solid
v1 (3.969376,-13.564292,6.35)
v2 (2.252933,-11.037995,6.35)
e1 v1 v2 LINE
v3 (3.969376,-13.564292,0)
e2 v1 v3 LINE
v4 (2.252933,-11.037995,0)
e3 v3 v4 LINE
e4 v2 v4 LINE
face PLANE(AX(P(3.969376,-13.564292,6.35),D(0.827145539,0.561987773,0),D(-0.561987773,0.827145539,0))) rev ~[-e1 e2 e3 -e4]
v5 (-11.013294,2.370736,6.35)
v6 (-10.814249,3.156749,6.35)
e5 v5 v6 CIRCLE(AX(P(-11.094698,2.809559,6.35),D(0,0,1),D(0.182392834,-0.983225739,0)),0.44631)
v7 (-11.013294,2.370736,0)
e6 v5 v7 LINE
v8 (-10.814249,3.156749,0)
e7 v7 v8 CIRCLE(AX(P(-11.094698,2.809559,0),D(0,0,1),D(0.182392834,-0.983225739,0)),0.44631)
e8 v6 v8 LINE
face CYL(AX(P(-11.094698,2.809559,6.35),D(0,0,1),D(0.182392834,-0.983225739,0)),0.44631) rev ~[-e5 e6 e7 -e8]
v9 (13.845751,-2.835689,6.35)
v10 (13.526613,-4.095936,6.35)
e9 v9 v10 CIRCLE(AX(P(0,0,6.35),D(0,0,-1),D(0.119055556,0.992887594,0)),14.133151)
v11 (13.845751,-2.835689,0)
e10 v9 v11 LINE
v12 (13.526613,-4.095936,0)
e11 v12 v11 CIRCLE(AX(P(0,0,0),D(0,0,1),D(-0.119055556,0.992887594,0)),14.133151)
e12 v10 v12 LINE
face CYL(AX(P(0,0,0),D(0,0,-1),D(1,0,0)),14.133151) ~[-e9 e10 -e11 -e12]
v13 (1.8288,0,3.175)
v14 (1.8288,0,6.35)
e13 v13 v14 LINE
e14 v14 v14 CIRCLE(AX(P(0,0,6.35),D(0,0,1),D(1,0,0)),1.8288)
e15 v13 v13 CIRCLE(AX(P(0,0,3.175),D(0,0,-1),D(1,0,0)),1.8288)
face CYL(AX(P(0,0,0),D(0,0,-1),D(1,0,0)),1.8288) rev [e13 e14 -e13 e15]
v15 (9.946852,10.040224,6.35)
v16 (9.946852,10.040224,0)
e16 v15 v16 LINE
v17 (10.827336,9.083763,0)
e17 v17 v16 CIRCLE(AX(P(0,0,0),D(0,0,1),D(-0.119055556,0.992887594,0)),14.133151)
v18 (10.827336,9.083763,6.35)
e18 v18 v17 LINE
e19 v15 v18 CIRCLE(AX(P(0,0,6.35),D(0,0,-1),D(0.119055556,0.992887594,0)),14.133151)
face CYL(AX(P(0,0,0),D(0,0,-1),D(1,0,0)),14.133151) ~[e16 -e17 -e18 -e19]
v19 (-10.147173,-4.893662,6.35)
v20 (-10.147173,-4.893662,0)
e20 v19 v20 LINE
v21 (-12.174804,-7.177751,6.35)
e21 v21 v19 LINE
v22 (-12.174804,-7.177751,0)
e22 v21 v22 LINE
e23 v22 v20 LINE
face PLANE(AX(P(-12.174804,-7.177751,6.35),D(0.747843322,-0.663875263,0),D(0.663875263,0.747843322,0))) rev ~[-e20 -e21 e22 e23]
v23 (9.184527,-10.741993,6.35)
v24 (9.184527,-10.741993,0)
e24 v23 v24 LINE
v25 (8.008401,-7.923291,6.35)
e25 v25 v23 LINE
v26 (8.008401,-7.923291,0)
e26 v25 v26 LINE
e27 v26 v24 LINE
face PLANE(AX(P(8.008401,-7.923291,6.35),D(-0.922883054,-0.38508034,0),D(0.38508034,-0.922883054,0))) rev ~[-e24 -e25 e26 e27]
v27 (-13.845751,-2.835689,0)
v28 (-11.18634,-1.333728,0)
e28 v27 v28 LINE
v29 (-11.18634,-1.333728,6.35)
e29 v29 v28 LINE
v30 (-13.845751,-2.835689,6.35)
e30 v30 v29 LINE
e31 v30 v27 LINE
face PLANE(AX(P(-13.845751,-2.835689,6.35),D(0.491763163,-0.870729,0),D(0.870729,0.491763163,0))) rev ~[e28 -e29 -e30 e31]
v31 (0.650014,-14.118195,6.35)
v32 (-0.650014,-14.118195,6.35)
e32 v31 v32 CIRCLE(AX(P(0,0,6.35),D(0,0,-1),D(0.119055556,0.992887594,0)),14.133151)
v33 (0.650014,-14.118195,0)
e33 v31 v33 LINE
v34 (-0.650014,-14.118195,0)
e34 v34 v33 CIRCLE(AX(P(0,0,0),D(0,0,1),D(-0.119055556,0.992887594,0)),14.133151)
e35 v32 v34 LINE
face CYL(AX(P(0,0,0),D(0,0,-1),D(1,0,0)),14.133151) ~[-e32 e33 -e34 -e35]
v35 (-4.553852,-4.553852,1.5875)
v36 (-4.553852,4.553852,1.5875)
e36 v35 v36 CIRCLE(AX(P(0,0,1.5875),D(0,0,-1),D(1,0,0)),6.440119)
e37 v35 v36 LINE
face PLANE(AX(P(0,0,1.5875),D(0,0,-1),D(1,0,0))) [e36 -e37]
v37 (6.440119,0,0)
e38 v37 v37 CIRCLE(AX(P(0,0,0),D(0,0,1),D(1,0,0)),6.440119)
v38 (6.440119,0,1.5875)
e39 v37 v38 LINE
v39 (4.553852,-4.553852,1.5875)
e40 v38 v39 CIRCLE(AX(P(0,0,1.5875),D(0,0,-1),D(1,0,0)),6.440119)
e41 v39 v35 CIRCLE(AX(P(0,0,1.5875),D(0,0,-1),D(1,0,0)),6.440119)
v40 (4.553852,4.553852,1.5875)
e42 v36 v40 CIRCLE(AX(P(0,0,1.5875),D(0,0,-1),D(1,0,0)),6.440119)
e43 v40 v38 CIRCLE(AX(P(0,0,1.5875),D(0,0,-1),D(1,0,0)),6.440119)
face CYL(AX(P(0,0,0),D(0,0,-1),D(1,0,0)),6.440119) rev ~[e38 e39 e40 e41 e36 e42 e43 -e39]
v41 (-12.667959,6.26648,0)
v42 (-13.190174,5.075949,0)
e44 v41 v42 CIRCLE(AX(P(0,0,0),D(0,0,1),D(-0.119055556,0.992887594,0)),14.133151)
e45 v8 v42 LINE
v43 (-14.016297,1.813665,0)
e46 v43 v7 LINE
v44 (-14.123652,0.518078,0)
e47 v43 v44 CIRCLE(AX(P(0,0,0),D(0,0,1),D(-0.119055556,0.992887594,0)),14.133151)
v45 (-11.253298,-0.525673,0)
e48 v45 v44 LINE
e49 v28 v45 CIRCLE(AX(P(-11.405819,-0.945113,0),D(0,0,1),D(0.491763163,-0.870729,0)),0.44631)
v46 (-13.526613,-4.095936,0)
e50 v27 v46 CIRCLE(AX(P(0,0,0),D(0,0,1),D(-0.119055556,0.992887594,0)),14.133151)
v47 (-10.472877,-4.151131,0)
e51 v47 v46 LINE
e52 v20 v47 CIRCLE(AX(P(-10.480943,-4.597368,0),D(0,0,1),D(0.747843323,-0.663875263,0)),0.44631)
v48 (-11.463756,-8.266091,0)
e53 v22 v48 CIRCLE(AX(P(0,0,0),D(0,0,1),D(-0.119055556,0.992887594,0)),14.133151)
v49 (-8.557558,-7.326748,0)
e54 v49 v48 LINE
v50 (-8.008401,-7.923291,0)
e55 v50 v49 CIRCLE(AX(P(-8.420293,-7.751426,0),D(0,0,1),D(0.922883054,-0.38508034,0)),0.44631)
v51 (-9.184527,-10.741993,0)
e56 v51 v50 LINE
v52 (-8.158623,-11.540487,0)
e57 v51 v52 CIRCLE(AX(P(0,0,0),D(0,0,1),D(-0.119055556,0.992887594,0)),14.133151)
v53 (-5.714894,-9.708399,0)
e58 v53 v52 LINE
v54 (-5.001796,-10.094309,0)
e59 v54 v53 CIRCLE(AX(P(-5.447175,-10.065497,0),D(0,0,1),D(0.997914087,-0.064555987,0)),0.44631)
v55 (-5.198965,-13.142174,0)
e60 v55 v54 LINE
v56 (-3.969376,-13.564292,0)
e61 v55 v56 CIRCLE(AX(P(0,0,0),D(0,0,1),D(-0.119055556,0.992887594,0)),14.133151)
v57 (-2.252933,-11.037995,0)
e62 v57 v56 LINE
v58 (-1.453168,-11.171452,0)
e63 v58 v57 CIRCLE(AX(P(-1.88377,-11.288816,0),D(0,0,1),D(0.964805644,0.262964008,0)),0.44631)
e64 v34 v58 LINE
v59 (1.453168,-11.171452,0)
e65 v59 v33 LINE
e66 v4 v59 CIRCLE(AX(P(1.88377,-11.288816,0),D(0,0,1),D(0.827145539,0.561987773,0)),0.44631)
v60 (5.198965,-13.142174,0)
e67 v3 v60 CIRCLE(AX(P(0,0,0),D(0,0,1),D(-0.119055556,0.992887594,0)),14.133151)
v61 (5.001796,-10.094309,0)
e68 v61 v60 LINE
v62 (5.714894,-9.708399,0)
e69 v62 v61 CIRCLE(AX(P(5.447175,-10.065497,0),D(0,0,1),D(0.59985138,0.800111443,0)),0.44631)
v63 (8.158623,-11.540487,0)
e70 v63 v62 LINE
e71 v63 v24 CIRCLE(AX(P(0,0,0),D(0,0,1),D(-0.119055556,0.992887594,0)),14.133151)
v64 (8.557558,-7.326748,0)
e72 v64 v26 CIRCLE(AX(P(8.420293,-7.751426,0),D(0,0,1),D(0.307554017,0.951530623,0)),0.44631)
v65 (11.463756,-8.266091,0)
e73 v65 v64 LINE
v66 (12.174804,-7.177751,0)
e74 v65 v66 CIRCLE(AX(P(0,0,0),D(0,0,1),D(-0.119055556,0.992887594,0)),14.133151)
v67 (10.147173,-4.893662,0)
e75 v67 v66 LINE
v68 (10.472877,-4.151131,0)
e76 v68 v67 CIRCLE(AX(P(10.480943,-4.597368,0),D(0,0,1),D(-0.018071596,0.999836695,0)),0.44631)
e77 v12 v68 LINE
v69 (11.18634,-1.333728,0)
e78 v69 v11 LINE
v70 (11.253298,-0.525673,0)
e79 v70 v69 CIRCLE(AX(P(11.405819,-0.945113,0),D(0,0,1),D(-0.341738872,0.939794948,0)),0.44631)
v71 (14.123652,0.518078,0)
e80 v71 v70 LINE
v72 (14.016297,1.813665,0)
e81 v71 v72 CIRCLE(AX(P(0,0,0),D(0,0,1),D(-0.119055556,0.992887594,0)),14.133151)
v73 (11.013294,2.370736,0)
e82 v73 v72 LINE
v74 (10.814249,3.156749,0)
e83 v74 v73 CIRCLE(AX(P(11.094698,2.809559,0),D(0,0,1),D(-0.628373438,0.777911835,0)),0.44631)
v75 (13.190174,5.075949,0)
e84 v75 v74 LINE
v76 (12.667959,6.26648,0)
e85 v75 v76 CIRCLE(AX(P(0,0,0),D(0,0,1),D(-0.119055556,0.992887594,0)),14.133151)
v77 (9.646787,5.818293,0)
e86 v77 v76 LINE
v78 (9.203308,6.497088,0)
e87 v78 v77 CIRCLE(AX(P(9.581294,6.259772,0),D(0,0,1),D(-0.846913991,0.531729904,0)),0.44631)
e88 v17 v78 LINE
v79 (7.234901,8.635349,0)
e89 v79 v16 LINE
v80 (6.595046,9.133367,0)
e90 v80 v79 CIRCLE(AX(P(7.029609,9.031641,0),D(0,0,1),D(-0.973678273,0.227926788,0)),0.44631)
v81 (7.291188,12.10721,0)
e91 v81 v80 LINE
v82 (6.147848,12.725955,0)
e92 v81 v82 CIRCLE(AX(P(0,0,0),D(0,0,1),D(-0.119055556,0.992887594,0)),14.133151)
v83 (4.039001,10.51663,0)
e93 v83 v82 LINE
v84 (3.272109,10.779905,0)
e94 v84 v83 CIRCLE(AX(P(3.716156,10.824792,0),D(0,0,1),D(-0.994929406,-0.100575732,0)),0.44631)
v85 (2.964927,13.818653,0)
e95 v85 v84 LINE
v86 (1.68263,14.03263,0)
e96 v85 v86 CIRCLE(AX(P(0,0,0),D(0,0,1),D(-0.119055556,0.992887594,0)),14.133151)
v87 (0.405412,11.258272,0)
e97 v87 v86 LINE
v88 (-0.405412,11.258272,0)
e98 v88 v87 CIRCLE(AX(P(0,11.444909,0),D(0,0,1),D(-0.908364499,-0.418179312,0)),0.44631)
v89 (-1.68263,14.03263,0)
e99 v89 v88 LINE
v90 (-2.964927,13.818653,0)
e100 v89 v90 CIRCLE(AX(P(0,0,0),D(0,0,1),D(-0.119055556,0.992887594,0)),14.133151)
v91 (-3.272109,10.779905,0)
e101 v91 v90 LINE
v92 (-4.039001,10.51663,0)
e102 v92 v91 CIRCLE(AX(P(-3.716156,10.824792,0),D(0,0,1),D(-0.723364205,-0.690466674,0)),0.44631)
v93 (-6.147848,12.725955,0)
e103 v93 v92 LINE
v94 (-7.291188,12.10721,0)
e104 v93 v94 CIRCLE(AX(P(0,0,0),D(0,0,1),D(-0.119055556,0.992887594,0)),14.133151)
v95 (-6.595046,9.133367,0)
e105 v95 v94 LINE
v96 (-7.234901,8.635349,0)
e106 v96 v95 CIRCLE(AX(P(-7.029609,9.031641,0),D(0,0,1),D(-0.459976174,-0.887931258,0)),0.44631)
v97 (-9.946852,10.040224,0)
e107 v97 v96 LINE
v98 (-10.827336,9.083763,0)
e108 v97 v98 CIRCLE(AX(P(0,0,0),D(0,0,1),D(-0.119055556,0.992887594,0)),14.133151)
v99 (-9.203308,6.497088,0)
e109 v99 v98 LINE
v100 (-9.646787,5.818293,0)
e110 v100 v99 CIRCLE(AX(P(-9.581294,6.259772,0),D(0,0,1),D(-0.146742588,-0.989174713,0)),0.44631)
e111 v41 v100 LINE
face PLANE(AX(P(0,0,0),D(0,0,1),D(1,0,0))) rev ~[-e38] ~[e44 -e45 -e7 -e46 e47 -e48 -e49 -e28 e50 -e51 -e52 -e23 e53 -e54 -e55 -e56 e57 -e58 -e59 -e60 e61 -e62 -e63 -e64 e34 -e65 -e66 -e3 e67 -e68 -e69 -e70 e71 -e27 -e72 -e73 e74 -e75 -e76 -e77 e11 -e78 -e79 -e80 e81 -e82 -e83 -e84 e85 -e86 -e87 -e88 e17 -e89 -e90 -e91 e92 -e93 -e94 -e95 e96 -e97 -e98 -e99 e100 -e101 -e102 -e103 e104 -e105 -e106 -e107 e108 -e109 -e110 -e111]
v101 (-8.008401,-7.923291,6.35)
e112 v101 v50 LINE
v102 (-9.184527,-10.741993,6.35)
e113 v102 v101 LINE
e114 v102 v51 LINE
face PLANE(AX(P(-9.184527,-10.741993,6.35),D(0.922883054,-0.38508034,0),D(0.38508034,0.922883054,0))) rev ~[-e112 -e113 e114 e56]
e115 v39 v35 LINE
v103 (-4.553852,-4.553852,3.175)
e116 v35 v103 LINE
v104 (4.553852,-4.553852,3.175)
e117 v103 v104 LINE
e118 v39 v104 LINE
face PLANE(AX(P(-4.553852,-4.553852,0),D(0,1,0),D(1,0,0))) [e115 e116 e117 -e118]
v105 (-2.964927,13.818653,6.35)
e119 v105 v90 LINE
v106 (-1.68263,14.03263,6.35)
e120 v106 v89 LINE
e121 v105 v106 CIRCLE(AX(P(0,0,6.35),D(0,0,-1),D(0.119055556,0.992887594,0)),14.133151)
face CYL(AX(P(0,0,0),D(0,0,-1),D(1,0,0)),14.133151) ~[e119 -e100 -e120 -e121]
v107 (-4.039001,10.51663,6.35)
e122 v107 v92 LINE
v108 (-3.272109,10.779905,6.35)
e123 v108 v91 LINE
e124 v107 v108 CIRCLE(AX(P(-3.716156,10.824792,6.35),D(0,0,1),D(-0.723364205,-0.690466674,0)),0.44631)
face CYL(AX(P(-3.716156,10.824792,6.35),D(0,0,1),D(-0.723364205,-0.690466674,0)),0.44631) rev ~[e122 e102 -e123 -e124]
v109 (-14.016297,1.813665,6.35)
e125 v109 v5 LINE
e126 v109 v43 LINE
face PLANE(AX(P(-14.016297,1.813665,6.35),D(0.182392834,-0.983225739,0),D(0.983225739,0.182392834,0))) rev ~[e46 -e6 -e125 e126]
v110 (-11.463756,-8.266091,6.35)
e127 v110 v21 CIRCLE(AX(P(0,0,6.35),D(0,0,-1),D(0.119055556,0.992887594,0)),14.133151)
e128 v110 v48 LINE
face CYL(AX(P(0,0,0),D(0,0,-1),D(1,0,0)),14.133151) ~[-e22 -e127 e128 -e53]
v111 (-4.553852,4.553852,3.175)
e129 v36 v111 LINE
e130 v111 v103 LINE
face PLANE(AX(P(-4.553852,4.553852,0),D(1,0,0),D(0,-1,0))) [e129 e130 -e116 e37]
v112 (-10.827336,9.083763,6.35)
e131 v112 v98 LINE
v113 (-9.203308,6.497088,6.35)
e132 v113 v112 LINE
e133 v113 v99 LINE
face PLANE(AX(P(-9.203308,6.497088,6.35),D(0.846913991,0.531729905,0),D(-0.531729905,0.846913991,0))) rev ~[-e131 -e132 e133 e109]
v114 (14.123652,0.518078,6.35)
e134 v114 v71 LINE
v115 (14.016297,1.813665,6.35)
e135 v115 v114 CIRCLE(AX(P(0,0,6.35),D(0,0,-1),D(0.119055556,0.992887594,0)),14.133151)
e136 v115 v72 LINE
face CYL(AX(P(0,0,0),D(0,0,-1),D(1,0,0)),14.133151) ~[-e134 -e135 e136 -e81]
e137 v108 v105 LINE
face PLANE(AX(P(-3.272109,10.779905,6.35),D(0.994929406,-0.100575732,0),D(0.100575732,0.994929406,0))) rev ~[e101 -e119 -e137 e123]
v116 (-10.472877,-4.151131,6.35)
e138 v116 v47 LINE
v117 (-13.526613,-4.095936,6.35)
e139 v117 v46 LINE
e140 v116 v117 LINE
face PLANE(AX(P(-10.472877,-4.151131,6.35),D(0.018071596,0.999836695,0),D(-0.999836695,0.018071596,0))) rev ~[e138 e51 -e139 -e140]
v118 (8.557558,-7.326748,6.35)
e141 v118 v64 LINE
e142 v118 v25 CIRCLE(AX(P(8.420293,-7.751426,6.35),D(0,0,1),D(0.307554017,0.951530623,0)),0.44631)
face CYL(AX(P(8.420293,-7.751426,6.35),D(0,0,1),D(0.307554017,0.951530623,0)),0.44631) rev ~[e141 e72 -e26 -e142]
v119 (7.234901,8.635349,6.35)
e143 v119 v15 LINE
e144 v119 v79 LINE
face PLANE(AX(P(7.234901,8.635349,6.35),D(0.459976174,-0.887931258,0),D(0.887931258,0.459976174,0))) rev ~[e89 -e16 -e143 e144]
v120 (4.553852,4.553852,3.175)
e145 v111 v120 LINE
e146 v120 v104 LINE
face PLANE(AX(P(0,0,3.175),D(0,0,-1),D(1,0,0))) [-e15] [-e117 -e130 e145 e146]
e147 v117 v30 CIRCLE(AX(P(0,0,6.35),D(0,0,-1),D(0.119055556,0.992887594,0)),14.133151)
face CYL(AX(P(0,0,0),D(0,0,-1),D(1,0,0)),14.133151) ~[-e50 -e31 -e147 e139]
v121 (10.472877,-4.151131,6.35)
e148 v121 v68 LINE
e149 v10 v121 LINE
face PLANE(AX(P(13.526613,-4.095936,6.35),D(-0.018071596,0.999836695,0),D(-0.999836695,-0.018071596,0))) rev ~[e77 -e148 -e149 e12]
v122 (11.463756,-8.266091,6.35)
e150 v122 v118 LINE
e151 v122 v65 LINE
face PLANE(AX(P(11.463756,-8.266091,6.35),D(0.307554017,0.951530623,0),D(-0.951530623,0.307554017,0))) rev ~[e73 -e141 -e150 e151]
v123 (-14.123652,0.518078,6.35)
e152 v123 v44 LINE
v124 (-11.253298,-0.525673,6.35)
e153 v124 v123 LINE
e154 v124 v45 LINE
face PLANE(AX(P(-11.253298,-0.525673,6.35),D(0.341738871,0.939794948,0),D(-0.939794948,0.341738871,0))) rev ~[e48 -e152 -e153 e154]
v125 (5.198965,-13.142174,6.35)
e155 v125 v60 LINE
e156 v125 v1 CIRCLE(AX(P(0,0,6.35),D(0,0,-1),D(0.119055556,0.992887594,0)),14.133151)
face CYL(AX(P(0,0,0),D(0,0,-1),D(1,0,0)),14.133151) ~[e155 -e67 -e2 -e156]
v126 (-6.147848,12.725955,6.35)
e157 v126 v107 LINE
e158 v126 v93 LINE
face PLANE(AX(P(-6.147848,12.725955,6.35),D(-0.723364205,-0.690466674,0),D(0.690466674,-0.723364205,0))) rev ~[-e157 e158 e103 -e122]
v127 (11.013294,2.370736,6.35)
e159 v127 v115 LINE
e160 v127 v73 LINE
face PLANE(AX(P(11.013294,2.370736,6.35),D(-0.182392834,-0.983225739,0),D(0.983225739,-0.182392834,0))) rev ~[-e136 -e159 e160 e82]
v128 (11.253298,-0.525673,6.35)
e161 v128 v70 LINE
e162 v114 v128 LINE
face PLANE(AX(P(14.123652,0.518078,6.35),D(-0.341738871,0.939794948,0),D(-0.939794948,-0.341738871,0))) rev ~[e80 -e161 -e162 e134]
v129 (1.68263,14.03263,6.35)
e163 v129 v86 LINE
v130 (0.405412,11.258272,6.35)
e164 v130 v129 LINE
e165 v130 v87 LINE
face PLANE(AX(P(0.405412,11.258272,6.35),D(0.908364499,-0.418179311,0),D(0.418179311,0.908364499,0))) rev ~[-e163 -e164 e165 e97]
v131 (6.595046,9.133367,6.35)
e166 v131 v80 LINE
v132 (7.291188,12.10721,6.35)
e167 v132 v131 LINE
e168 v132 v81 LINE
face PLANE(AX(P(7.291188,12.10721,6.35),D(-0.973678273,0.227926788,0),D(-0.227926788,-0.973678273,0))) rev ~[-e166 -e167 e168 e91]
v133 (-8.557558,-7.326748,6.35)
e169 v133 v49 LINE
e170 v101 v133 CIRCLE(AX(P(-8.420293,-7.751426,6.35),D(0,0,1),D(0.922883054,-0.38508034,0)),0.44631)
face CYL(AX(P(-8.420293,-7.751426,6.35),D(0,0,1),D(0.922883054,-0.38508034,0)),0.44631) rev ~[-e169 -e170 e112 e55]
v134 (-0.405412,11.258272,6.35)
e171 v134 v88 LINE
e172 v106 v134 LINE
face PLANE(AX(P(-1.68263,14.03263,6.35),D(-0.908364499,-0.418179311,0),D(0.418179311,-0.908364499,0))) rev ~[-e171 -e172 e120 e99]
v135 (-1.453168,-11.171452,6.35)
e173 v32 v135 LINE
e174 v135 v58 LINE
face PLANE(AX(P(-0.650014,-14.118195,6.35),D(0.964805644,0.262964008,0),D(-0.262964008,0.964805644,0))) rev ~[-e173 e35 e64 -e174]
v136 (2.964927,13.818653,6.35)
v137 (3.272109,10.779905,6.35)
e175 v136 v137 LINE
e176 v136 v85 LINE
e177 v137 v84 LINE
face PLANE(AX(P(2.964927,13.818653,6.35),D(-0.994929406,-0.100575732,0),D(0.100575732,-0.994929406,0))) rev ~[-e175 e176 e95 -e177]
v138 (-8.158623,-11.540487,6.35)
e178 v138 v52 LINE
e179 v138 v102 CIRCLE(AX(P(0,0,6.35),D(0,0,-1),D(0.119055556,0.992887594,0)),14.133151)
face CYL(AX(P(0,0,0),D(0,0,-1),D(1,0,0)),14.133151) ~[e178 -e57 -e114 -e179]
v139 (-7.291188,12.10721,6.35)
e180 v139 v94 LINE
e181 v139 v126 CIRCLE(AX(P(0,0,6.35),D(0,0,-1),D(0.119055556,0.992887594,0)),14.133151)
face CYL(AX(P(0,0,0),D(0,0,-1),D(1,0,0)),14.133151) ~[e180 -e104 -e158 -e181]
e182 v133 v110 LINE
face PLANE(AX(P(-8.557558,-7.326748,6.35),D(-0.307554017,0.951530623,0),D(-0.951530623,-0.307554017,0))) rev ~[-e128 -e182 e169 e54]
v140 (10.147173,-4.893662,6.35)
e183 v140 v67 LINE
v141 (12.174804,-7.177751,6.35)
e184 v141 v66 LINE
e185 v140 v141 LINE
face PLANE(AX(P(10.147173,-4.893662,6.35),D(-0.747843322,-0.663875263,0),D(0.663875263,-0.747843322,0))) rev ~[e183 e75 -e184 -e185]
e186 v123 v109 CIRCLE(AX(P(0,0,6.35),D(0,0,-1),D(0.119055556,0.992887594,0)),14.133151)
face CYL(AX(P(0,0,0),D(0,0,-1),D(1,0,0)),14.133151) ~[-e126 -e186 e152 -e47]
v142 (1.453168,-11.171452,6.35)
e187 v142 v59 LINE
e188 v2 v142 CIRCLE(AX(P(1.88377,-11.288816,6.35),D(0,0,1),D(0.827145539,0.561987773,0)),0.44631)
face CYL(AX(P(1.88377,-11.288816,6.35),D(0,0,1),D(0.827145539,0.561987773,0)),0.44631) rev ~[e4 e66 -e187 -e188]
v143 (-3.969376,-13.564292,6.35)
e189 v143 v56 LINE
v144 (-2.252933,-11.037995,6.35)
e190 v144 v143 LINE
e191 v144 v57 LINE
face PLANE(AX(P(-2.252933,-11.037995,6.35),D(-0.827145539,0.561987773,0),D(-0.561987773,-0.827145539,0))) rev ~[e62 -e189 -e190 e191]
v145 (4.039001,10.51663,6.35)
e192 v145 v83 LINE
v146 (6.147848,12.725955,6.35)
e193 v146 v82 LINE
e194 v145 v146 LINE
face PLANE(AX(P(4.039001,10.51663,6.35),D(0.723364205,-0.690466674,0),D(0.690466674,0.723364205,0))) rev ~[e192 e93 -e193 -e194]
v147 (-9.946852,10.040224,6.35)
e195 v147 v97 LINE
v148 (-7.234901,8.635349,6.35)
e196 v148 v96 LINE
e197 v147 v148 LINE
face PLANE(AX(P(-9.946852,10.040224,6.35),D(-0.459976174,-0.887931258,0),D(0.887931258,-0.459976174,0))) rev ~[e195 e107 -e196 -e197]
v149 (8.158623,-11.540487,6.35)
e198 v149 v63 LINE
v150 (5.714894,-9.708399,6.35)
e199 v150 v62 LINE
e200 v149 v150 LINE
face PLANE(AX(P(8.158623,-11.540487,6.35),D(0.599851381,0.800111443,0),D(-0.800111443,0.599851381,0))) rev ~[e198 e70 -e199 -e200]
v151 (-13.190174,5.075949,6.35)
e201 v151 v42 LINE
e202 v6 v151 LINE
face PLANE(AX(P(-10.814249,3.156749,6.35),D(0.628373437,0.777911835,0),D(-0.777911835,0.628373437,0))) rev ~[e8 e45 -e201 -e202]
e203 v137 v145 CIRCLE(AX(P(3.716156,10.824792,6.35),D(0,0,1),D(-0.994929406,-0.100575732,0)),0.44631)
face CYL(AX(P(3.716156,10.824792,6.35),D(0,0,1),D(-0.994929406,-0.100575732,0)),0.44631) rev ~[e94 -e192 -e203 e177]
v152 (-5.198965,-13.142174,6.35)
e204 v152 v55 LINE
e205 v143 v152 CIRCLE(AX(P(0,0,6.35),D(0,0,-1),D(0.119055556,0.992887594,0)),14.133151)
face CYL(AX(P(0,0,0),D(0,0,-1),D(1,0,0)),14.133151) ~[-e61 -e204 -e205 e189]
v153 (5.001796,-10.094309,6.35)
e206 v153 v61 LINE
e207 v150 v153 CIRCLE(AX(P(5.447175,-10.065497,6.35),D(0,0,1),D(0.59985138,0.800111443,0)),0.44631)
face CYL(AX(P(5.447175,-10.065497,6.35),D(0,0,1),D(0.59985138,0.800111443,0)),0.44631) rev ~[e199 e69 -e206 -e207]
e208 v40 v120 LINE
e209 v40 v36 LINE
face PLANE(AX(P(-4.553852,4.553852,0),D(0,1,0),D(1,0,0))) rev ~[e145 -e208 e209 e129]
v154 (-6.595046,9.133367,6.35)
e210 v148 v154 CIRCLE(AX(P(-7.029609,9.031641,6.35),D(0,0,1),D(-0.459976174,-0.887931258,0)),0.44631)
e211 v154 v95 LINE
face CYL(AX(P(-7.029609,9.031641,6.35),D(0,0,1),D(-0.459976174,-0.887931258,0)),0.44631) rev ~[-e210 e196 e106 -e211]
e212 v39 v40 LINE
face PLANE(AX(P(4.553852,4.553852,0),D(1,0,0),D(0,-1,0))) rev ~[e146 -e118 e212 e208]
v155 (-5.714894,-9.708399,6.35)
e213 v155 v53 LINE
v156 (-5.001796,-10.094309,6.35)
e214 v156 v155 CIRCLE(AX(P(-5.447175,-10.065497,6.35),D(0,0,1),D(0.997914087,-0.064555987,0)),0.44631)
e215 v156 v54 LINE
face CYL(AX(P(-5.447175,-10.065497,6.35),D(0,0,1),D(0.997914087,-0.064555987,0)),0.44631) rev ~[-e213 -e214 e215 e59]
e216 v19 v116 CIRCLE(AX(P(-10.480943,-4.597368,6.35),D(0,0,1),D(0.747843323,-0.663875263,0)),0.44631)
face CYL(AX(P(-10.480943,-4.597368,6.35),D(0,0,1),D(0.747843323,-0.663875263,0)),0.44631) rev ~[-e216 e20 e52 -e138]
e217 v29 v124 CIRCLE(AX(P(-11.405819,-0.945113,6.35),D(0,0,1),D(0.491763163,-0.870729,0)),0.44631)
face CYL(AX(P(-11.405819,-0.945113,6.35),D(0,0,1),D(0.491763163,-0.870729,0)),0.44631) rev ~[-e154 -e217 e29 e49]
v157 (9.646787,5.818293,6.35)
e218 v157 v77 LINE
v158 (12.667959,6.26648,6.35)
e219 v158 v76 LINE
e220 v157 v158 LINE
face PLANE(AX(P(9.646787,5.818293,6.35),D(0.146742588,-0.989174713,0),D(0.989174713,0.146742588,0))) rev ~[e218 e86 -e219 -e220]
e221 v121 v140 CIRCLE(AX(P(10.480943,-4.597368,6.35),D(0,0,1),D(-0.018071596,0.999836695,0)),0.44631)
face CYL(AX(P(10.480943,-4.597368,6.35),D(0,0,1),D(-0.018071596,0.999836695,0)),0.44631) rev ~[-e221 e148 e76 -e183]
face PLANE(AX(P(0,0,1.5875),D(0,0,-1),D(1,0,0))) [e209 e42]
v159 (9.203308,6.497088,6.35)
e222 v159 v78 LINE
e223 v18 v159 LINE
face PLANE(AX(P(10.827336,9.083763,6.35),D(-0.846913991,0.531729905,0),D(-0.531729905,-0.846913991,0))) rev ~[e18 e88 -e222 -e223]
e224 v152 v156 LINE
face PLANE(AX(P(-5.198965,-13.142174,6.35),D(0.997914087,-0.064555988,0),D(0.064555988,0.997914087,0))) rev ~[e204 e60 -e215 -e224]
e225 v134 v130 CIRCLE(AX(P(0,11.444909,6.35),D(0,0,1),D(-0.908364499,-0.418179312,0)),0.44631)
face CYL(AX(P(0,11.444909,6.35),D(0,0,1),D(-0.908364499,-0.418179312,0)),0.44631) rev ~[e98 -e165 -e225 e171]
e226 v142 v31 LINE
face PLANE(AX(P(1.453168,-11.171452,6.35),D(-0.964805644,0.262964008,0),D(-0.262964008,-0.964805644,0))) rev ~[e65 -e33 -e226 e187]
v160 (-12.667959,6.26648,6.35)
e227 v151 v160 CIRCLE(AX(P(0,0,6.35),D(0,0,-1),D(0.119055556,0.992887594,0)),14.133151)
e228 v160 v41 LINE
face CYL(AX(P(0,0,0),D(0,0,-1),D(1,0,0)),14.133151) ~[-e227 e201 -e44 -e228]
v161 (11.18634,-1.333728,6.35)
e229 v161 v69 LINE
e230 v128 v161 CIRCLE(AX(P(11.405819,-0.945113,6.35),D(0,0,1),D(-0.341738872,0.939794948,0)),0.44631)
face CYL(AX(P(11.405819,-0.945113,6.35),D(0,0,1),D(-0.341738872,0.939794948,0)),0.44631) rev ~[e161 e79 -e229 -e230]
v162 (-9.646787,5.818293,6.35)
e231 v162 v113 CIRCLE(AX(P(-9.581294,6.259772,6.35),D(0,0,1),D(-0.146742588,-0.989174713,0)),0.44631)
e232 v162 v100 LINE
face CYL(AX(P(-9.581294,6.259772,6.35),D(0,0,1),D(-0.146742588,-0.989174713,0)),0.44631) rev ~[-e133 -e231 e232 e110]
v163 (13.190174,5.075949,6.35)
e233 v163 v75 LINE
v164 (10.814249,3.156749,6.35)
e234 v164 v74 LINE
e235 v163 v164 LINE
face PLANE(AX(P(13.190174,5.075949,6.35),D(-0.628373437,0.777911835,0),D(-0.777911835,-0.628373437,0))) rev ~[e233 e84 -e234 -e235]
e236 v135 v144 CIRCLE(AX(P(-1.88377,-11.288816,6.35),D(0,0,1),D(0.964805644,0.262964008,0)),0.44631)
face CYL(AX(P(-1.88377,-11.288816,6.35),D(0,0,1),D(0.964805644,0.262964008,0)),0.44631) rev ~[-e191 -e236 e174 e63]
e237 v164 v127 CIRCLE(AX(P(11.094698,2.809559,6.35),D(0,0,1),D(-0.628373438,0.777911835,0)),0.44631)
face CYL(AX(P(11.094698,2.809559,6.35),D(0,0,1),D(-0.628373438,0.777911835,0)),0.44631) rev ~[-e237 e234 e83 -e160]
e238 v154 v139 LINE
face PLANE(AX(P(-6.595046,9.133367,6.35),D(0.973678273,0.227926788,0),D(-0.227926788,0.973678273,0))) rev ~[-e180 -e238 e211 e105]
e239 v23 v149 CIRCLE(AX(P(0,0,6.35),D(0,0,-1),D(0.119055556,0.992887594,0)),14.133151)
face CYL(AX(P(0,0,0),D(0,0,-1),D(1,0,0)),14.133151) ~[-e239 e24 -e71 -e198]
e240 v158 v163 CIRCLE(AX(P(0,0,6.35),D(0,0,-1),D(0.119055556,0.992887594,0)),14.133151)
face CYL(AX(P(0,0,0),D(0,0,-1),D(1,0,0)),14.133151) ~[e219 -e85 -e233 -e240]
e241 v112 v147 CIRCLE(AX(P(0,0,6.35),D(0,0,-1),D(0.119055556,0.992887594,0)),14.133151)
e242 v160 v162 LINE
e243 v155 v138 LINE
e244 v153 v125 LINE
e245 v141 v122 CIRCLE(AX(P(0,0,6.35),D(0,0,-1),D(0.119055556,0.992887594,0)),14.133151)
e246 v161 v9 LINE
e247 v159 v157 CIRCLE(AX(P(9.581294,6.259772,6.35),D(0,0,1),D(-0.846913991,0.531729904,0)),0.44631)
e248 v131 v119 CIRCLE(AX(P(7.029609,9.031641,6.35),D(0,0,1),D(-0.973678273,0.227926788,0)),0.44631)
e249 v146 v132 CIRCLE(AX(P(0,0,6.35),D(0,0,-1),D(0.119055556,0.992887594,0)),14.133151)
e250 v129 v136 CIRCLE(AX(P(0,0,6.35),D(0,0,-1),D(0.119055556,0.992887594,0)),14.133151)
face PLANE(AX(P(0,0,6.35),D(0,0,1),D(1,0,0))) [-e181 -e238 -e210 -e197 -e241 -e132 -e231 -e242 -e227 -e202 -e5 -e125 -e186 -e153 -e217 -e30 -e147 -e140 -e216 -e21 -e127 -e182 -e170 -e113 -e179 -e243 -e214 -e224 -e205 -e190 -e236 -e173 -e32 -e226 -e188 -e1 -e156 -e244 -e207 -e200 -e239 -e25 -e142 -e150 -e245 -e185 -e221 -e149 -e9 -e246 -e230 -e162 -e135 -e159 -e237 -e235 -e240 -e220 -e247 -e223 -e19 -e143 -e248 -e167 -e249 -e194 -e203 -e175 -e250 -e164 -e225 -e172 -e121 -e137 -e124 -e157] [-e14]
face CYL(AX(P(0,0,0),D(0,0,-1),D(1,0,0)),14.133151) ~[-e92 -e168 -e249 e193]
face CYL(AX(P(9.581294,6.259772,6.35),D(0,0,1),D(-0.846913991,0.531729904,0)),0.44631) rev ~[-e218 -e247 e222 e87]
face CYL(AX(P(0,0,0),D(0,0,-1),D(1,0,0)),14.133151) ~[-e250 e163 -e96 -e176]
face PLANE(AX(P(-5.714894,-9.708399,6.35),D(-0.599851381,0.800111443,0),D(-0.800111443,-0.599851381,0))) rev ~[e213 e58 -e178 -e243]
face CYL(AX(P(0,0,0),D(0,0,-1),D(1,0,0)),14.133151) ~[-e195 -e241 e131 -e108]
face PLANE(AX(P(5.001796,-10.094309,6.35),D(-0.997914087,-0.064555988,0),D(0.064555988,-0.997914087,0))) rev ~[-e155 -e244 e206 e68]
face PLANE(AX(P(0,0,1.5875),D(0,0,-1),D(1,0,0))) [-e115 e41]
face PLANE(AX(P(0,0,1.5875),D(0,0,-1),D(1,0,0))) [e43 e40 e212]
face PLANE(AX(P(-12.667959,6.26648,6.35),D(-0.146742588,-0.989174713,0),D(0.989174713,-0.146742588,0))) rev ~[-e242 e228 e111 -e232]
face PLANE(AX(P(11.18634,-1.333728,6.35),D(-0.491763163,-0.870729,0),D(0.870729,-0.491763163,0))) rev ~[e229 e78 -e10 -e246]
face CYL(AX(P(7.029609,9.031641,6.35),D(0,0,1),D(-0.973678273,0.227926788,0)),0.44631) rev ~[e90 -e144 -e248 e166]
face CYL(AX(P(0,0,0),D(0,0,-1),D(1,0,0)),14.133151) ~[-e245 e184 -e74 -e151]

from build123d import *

# Parameters (mm, degrees)
F0_R            = 14.1331511128
F0_R_2          = 1.8288
F1_DEPTH        = 6.35
F2_W            = 9.1077039159
F2_H            = 9.1077039159
F3_DEPTH        = 3.175
F4_R            = 6.4401192
F5_DEPTH        = 1.5875
F7_DEPTH        = 6.35
F7_COPIES_COUNT = 19


# Not quite as in the source:
# - a pattern or mirror of a feature is missing from the dataset's text; its kind, count and spacing are read off the source's solid


with BuildPart() as f1:
    # F0 (on Top) → F1 (new body)
    with BuildSketch(Plane.XY):
        Circle(F0_R)
        Circle(F0_R_2, mode=Mode.SUBTRACT)
    extrude(amount=F1_DEPTH)

    # F2 (on face) → F3 (cut)
    with BuildSketch(Plane(origin=(0, 0, 0), x_dir=(1, 0, 0), z_dir=(0, 0, -1))):
        Rectangle(F2_W, F2_H)
    extrude(amount=-F3_DEPTH, mode=Mode.SUBTRACT)

    # F4 (on face) → F5 (cut)
    with BuildSketch(Plane(origin=(0, 0, 0), x_dir=(1, 0, 0), z_dir=(0, 0, -1))):
        Circle(F4_R)
    extrude(amount=-F5_DEPTH, mode=Mode.SUBTRACT)

    # F6 (on face) → F7 (cut, through all)
    with BuildSketch(Plane.XY.offset(6.35)):
        with BuildLine():
            Line((0.4054121916, 11.2582715851), (1.6826301613, 14.0326304063))
            ThreePointArc((1.6826301613, 14.0326304063), (0, 14.1331511128), (-1.6826301613, 14.0326304063))
            Line((-1.6826301613, 14.0326304063), (-0.4054121916, 11.2582715851))
            ThreePointArc((-0.4054121916, 11.2582715851), (0, 10.9985991732), (0.4054121916, 11.2582715851))
        make_face()
    f7 = extrude(amount=-F7_DEPTH, mode=Mode.SUBTRACT)

    # F7_copies: F7 ×19 about axis
    f7_copies_axis = Axis((0, 0, 0), (0, 0, 1))
    for i in range(1, F7_COPIES_COUNT):
        add(f7.rotate(f7_copies_axis, i * 360 / F7_COPIES_COUNT), mode=Mode.SUBTRACT)


solid = f1.part
